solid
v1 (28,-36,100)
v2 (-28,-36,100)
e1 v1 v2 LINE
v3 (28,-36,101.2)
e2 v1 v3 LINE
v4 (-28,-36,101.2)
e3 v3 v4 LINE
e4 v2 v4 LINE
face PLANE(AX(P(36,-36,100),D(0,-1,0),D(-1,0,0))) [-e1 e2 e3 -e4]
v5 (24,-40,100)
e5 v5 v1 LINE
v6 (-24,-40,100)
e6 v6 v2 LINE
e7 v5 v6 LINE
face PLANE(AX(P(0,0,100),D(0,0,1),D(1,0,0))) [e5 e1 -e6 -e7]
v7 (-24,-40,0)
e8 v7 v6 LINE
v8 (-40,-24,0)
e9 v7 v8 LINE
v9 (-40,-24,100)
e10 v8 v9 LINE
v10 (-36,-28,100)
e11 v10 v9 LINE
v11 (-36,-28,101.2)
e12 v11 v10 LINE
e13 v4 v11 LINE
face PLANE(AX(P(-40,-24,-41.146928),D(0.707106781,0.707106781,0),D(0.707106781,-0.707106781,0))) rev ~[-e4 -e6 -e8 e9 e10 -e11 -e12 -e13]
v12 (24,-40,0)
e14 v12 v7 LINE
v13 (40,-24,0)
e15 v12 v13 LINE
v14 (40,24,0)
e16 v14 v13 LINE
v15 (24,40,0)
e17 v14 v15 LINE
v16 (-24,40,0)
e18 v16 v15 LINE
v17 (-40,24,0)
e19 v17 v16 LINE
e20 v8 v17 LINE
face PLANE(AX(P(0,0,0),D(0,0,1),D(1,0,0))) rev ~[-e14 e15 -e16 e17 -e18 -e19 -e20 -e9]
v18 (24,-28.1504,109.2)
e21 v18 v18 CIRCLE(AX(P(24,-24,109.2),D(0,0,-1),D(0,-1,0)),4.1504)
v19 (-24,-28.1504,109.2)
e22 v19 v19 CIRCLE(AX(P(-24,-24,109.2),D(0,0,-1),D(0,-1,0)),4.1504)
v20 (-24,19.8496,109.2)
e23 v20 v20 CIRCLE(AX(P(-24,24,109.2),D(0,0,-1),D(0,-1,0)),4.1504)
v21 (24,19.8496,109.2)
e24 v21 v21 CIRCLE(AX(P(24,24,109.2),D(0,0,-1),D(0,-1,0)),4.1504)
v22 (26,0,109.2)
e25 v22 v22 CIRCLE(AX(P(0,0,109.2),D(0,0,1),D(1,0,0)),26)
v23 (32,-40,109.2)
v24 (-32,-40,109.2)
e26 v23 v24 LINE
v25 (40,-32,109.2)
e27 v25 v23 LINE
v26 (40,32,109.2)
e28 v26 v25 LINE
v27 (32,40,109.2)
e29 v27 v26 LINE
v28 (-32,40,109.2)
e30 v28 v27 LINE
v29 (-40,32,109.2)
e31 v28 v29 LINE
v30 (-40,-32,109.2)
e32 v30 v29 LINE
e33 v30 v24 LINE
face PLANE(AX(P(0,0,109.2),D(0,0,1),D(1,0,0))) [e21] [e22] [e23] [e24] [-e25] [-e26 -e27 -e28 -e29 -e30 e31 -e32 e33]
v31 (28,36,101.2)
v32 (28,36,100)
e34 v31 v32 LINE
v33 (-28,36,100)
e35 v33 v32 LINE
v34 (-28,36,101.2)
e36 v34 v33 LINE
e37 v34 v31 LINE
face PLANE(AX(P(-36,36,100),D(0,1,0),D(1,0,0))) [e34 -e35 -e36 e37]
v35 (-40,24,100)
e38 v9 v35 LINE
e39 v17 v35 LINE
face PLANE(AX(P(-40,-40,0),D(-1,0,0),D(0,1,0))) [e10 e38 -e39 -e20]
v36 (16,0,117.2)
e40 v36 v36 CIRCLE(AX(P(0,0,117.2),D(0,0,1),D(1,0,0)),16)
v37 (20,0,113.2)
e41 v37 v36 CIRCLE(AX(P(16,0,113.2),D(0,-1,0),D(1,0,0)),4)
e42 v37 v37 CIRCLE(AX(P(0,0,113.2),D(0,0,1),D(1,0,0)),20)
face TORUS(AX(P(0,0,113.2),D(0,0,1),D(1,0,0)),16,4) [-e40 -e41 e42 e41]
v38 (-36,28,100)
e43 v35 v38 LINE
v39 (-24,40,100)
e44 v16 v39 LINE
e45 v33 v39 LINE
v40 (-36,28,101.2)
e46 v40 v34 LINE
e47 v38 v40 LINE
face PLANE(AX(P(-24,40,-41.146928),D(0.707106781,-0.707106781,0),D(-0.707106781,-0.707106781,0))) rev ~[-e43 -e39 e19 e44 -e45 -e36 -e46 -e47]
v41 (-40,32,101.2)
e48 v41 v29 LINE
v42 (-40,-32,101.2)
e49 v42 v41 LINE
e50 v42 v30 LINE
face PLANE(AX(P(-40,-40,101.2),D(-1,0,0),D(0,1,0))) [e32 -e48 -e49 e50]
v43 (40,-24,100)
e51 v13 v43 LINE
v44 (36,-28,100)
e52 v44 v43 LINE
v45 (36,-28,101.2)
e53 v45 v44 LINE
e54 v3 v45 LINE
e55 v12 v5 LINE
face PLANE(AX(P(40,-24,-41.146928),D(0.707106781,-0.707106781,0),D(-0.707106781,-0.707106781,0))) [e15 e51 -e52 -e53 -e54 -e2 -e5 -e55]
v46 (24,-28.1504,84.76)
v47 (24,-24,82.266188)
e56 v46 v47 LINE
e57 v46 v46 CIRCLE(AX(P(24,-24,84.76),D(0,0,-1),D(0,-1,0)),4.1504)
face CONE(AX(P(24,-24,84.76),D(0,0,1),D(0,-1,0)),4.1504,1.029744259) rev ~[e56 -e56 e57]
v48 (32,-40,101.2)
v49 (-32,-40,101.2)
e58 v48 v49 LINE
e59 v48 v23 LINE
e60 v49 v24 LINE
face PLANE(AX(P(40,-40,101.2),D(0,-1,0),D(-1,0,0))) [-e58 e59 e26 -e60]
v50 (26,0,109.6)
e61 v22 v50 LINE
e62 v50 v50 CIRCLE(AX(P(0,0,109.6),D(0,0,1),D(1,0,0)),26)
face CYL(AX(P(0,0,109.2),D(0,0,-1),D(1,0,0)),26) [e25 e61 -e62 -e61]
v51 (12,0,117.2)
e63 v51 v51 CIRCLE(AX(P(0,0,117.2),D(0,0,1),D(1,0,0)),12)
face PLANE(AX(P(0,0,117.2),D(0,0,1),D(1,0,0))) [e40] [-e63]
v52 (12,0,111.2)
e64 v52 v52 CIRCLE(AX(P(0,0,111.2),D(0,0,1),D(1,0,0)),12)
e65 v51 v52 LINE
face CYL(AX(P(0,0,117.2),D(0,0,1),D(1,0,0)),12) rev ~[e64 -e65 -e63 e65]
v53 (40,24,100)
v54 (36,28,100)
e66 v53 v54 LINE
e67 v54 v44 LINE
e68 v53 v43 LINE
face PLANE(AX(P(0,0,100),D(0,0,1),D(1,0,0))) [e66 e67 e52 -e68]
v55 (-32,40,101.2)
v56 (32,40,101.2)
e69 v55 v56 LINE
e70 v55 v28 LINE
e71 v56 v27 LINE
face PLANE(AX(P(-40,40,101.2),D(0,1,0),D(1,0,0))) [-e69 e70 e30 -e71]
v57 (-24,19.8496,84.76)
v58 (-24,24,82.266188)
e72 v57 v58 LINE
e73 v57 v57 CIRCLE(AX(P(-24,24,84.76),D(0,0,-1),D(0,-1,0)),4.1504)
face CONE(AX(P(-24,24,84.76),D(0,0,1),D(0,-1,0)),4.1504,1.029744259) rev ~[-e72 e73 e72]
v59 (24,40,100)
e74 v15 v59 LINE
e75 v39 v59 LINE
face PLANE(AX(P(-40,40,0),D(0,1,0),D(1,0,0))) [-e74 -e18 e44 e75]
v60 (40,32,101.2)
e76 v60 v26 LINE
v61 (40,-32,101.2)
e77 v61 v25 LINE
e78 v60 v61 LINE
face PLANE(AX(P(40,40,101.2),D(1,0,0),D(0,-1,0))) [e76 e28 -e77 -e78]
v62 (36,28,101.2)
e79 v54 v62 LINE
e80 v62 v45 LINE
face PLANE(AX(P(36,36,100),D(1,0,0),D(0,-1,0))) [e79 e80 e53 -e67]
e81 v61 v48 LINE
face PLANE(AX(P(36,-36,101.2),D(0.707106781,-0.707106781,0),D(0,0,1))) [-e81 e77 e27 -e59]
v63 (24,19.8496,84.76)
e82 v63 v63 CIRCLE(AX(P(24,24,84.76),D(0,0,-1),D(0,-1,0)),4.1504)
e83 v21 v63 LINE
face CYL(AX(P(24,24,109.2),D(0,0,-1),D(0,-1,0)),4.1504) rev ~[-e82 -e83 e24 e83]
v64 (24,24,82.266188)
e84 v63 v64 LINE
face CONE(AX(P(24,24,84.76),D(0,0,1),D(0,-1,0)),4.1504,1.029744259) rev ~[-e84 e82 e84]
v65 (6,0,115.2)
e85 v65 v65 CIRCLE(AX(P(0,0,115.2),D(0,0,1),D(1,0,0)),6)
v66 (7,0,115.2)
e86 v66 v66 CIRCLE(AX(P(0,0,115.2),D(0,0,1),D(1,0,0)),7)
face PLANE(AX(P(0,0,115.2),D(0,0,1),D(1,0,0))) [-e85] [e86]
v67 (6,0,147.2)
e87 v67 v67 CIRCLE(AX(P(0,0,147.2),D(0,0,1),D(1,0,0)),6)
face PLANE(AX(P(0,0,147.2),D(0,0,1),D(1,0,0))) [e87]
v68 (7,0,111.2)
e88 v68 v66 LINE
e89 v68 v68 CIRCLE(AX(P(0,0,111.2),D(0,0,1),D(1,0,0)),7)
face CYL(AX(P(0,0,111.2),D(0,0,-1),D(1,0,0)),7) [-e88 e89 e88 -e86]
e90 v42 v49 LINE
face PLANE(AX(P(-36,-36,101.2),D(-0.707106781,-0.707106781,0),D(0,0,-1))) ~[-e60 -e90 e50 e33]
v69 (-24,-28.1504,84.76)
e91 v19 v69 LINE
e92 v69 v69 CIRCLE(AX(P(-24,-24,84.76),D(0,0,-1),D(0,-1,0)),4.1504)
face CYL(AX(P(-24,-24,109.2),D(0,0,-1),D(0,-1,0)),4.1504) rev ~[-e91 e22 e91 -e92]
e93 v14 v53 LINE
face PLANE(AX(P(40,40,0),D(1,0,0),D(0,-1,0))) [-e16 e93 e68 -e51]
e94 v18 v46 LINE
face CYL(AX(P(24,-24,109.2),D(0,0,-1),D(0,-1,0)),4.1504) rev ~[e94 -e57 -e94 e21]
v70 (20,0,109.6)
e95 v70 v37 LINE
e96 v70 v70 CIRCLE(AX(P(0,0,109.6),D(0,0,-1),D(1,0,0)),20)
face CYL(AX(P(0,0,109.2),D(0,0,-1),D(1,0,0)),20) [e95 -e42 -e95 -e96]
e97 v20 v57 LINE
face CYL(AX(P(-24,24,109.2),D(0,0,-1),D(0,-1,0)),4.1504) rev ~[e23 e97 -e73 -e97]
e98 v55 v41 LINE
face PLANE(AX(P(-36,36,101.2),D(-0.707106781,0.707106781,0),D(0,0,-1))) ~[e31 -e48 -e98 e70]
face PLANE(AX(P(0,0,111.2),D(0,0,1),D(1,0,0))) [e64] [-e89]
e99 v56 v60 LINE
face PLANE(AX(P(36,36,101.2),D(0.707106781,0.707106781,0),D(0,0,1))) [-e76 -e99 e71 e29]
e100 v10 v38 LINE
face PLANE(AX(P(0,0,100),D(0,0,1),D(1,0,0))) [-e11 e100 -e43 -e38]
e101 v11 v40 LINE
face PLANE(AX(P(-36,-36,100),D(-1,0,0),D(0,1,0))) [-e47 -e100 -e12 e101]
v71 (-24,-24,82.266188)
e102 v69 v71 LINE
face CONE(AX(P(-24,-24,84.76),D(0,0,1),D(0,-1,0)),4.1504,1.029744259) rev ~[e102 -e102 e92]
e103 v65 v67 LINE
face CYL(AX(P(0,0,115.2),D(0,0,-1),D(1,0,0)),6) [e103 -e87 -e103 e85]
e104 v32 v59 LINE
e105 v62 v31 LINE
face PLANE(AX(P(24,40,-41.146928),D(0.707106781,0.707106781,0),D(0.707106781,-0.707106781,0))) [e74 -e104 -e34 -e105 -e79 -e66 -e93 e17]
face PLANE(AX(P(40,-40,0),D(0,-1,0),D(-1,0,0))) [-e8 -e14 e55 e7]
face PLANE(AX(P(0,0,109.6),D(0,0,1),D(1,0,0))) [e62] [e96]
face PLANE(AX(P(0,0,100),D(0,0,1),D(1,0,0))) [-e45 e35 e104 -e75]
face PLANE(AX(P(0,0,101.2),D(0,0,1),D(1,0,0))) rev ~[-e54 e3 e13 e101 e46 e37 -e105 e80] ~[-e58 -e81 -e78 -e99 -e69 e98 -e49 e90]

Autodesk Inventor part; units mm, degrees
ref_plane "YZ Plane" through (0, 0, 0) normal (1, 0, 0) x (0, 1, 0)
ref_plane "XZ Plane" through (0, 0, 0) normal (0, 1, 0) x (-1, 0, 0)
ref_plane "XY Plane" through (0, 0, 0) normal (0, 0, 1) x (1, 0, 0)
sketch "草图1" plane through (0, 0, 0) normal (0, 0, 1) x (1, 0, 0)
  line L0 (-100, 100) -> (100, 100)
  line L1 (100, 100) -> (100, -100)
  line L2 (100, -100) -> (-100, -100)
  line L3 (-100, -100) -> (-100, 100)
  line L4 (-100, 100) -> (100, -100) construction
  line L5 (100, 100) -> (-100, -100) construction
  point P0 (0, 0)
  dimension "d0" = 200
  dimension "d1" = 200
extrude "拉伸1" add sketch "草图1" along normal blind 250
sketch "草图3" plane through (0, 0, 250) normal (0, 0, 1) x (1, 0, 0)
  line L0 (-90, 90) -> (90, 90)
  line L1 (90, 90) -> (90, -90)
  line L2 (90, -90) -> (-90, -90)
  line L3 (-90, -90) -> (-90, 90)
  line L4 (-90, 90) -> (90, -90) construction
  line L5 (90, 90) -> (-90, -90) construction
  point P0 (0, 0)
  dimension "d6" = 180
  dimension "d7" = 180
extrude "拉伸2" add sketch "草图3" along normal blind 3
chamfer "倒角1" distance 40 angle 45 4 edges at (100, 100, 125) (-100, -100, 125) (100, -100, 125) (-100, 100, 125)
sketch "草图4" plane through (0, 0, 253) normal (0, 0, 1) x (1, 0, 0)
  line L0 (-100, 100) -> (100, 100)
  line L1 (100, 100) -> (100, -100)
  line L2 (100, -100) -> (-100, -100)
  line L3 (-100, -100) -> (-100, 100)
  line L4 (-100, 100) -> (100, -100) construction
  line L5 (100, 100) -> (-100, -100) construction
  point P0 (0, 0)
  dimension "d10" = 200
  dimension "d11" = 200
extrude "拉伸3" add sketch "草图4" along normal blind 20
sketch "草图5" plane through (0, 0, 273) normal (0, 0, 1) x (1, 0, 0)
  circle A0 centre (0, 0) radius 50
  dimension "d17" = 100
extrude "拉伸4" add sketch "草图5" along normal blind 20
fillet "圆角1" radius 10 1 edges at (-50, 0, 293)
sketch "草图6" plane through (0, 0, 273) normal (0, 0, 1) x (1, 0, 0)
  circle A0 centre (0, 0) radius 65
  dimension "d21" = 130
extrude "拉伸5" add sketch "草图6" along normal blind 1
sketch "草图7" plane through (0, 0, 293) normal (0, 0, 1) x (1, 0, 0)
  circle A0 centre (0, 0) radius 30
  dimension "d24" = 60
extrude "拉伸6" cut sketch "草图7" against normal blind 15
sketch "草图8" plane through (0, 0, 278) normal (0, 0, 1) x (1, 0, 0)
  circle A0 centre (0, 0) radius 17.5
  dimension "d27" = 35
extrude "拉伸7" add sketch "草图8" along normal blind 10
sketch "草图9" plane through (0, 0, 288) normal (0, 0, 1) x (1, 0, 0)
  circle A0 centre (0, 0) radius 15
  dimension "d30" = 30
extrude "拉伸8" add sketch "草图9" along normal blind 80
sketch "草图10" plane through (0, 0, 273) normal (0, 0, 1) x (1, 0, 0)
  point P0 (0, 0)
  point P1 (-60, 60)
  point P2 (60, 60)
  point P3 (60, -60)
  point P4 (-60, -60)
  dimension "d33" = 60
  dimension "d34" = 60
  dimension "d37" = 360
hole "孔1" at (-60, 60, 273) at (60, 60, 273) at (60, -60, 273) at (-60, -60, 273) direction (0, 0, -1) diameter 20.752 depth 61.1 tip angle 118 thread size "M24x3" designation "M24" class "6H" standard "GB Metric profile"
chamfer "倒角2" distance 20 angle 45 4 edges at (-100, -100, 263) (100, -100, 263) (100, 100, 263) (-100, 100, 263)
scale "缩放比例1" factors (0.4, 0.4, 0.4) then translate (0, 0, 0) bodies 1
properties part number "电机"
